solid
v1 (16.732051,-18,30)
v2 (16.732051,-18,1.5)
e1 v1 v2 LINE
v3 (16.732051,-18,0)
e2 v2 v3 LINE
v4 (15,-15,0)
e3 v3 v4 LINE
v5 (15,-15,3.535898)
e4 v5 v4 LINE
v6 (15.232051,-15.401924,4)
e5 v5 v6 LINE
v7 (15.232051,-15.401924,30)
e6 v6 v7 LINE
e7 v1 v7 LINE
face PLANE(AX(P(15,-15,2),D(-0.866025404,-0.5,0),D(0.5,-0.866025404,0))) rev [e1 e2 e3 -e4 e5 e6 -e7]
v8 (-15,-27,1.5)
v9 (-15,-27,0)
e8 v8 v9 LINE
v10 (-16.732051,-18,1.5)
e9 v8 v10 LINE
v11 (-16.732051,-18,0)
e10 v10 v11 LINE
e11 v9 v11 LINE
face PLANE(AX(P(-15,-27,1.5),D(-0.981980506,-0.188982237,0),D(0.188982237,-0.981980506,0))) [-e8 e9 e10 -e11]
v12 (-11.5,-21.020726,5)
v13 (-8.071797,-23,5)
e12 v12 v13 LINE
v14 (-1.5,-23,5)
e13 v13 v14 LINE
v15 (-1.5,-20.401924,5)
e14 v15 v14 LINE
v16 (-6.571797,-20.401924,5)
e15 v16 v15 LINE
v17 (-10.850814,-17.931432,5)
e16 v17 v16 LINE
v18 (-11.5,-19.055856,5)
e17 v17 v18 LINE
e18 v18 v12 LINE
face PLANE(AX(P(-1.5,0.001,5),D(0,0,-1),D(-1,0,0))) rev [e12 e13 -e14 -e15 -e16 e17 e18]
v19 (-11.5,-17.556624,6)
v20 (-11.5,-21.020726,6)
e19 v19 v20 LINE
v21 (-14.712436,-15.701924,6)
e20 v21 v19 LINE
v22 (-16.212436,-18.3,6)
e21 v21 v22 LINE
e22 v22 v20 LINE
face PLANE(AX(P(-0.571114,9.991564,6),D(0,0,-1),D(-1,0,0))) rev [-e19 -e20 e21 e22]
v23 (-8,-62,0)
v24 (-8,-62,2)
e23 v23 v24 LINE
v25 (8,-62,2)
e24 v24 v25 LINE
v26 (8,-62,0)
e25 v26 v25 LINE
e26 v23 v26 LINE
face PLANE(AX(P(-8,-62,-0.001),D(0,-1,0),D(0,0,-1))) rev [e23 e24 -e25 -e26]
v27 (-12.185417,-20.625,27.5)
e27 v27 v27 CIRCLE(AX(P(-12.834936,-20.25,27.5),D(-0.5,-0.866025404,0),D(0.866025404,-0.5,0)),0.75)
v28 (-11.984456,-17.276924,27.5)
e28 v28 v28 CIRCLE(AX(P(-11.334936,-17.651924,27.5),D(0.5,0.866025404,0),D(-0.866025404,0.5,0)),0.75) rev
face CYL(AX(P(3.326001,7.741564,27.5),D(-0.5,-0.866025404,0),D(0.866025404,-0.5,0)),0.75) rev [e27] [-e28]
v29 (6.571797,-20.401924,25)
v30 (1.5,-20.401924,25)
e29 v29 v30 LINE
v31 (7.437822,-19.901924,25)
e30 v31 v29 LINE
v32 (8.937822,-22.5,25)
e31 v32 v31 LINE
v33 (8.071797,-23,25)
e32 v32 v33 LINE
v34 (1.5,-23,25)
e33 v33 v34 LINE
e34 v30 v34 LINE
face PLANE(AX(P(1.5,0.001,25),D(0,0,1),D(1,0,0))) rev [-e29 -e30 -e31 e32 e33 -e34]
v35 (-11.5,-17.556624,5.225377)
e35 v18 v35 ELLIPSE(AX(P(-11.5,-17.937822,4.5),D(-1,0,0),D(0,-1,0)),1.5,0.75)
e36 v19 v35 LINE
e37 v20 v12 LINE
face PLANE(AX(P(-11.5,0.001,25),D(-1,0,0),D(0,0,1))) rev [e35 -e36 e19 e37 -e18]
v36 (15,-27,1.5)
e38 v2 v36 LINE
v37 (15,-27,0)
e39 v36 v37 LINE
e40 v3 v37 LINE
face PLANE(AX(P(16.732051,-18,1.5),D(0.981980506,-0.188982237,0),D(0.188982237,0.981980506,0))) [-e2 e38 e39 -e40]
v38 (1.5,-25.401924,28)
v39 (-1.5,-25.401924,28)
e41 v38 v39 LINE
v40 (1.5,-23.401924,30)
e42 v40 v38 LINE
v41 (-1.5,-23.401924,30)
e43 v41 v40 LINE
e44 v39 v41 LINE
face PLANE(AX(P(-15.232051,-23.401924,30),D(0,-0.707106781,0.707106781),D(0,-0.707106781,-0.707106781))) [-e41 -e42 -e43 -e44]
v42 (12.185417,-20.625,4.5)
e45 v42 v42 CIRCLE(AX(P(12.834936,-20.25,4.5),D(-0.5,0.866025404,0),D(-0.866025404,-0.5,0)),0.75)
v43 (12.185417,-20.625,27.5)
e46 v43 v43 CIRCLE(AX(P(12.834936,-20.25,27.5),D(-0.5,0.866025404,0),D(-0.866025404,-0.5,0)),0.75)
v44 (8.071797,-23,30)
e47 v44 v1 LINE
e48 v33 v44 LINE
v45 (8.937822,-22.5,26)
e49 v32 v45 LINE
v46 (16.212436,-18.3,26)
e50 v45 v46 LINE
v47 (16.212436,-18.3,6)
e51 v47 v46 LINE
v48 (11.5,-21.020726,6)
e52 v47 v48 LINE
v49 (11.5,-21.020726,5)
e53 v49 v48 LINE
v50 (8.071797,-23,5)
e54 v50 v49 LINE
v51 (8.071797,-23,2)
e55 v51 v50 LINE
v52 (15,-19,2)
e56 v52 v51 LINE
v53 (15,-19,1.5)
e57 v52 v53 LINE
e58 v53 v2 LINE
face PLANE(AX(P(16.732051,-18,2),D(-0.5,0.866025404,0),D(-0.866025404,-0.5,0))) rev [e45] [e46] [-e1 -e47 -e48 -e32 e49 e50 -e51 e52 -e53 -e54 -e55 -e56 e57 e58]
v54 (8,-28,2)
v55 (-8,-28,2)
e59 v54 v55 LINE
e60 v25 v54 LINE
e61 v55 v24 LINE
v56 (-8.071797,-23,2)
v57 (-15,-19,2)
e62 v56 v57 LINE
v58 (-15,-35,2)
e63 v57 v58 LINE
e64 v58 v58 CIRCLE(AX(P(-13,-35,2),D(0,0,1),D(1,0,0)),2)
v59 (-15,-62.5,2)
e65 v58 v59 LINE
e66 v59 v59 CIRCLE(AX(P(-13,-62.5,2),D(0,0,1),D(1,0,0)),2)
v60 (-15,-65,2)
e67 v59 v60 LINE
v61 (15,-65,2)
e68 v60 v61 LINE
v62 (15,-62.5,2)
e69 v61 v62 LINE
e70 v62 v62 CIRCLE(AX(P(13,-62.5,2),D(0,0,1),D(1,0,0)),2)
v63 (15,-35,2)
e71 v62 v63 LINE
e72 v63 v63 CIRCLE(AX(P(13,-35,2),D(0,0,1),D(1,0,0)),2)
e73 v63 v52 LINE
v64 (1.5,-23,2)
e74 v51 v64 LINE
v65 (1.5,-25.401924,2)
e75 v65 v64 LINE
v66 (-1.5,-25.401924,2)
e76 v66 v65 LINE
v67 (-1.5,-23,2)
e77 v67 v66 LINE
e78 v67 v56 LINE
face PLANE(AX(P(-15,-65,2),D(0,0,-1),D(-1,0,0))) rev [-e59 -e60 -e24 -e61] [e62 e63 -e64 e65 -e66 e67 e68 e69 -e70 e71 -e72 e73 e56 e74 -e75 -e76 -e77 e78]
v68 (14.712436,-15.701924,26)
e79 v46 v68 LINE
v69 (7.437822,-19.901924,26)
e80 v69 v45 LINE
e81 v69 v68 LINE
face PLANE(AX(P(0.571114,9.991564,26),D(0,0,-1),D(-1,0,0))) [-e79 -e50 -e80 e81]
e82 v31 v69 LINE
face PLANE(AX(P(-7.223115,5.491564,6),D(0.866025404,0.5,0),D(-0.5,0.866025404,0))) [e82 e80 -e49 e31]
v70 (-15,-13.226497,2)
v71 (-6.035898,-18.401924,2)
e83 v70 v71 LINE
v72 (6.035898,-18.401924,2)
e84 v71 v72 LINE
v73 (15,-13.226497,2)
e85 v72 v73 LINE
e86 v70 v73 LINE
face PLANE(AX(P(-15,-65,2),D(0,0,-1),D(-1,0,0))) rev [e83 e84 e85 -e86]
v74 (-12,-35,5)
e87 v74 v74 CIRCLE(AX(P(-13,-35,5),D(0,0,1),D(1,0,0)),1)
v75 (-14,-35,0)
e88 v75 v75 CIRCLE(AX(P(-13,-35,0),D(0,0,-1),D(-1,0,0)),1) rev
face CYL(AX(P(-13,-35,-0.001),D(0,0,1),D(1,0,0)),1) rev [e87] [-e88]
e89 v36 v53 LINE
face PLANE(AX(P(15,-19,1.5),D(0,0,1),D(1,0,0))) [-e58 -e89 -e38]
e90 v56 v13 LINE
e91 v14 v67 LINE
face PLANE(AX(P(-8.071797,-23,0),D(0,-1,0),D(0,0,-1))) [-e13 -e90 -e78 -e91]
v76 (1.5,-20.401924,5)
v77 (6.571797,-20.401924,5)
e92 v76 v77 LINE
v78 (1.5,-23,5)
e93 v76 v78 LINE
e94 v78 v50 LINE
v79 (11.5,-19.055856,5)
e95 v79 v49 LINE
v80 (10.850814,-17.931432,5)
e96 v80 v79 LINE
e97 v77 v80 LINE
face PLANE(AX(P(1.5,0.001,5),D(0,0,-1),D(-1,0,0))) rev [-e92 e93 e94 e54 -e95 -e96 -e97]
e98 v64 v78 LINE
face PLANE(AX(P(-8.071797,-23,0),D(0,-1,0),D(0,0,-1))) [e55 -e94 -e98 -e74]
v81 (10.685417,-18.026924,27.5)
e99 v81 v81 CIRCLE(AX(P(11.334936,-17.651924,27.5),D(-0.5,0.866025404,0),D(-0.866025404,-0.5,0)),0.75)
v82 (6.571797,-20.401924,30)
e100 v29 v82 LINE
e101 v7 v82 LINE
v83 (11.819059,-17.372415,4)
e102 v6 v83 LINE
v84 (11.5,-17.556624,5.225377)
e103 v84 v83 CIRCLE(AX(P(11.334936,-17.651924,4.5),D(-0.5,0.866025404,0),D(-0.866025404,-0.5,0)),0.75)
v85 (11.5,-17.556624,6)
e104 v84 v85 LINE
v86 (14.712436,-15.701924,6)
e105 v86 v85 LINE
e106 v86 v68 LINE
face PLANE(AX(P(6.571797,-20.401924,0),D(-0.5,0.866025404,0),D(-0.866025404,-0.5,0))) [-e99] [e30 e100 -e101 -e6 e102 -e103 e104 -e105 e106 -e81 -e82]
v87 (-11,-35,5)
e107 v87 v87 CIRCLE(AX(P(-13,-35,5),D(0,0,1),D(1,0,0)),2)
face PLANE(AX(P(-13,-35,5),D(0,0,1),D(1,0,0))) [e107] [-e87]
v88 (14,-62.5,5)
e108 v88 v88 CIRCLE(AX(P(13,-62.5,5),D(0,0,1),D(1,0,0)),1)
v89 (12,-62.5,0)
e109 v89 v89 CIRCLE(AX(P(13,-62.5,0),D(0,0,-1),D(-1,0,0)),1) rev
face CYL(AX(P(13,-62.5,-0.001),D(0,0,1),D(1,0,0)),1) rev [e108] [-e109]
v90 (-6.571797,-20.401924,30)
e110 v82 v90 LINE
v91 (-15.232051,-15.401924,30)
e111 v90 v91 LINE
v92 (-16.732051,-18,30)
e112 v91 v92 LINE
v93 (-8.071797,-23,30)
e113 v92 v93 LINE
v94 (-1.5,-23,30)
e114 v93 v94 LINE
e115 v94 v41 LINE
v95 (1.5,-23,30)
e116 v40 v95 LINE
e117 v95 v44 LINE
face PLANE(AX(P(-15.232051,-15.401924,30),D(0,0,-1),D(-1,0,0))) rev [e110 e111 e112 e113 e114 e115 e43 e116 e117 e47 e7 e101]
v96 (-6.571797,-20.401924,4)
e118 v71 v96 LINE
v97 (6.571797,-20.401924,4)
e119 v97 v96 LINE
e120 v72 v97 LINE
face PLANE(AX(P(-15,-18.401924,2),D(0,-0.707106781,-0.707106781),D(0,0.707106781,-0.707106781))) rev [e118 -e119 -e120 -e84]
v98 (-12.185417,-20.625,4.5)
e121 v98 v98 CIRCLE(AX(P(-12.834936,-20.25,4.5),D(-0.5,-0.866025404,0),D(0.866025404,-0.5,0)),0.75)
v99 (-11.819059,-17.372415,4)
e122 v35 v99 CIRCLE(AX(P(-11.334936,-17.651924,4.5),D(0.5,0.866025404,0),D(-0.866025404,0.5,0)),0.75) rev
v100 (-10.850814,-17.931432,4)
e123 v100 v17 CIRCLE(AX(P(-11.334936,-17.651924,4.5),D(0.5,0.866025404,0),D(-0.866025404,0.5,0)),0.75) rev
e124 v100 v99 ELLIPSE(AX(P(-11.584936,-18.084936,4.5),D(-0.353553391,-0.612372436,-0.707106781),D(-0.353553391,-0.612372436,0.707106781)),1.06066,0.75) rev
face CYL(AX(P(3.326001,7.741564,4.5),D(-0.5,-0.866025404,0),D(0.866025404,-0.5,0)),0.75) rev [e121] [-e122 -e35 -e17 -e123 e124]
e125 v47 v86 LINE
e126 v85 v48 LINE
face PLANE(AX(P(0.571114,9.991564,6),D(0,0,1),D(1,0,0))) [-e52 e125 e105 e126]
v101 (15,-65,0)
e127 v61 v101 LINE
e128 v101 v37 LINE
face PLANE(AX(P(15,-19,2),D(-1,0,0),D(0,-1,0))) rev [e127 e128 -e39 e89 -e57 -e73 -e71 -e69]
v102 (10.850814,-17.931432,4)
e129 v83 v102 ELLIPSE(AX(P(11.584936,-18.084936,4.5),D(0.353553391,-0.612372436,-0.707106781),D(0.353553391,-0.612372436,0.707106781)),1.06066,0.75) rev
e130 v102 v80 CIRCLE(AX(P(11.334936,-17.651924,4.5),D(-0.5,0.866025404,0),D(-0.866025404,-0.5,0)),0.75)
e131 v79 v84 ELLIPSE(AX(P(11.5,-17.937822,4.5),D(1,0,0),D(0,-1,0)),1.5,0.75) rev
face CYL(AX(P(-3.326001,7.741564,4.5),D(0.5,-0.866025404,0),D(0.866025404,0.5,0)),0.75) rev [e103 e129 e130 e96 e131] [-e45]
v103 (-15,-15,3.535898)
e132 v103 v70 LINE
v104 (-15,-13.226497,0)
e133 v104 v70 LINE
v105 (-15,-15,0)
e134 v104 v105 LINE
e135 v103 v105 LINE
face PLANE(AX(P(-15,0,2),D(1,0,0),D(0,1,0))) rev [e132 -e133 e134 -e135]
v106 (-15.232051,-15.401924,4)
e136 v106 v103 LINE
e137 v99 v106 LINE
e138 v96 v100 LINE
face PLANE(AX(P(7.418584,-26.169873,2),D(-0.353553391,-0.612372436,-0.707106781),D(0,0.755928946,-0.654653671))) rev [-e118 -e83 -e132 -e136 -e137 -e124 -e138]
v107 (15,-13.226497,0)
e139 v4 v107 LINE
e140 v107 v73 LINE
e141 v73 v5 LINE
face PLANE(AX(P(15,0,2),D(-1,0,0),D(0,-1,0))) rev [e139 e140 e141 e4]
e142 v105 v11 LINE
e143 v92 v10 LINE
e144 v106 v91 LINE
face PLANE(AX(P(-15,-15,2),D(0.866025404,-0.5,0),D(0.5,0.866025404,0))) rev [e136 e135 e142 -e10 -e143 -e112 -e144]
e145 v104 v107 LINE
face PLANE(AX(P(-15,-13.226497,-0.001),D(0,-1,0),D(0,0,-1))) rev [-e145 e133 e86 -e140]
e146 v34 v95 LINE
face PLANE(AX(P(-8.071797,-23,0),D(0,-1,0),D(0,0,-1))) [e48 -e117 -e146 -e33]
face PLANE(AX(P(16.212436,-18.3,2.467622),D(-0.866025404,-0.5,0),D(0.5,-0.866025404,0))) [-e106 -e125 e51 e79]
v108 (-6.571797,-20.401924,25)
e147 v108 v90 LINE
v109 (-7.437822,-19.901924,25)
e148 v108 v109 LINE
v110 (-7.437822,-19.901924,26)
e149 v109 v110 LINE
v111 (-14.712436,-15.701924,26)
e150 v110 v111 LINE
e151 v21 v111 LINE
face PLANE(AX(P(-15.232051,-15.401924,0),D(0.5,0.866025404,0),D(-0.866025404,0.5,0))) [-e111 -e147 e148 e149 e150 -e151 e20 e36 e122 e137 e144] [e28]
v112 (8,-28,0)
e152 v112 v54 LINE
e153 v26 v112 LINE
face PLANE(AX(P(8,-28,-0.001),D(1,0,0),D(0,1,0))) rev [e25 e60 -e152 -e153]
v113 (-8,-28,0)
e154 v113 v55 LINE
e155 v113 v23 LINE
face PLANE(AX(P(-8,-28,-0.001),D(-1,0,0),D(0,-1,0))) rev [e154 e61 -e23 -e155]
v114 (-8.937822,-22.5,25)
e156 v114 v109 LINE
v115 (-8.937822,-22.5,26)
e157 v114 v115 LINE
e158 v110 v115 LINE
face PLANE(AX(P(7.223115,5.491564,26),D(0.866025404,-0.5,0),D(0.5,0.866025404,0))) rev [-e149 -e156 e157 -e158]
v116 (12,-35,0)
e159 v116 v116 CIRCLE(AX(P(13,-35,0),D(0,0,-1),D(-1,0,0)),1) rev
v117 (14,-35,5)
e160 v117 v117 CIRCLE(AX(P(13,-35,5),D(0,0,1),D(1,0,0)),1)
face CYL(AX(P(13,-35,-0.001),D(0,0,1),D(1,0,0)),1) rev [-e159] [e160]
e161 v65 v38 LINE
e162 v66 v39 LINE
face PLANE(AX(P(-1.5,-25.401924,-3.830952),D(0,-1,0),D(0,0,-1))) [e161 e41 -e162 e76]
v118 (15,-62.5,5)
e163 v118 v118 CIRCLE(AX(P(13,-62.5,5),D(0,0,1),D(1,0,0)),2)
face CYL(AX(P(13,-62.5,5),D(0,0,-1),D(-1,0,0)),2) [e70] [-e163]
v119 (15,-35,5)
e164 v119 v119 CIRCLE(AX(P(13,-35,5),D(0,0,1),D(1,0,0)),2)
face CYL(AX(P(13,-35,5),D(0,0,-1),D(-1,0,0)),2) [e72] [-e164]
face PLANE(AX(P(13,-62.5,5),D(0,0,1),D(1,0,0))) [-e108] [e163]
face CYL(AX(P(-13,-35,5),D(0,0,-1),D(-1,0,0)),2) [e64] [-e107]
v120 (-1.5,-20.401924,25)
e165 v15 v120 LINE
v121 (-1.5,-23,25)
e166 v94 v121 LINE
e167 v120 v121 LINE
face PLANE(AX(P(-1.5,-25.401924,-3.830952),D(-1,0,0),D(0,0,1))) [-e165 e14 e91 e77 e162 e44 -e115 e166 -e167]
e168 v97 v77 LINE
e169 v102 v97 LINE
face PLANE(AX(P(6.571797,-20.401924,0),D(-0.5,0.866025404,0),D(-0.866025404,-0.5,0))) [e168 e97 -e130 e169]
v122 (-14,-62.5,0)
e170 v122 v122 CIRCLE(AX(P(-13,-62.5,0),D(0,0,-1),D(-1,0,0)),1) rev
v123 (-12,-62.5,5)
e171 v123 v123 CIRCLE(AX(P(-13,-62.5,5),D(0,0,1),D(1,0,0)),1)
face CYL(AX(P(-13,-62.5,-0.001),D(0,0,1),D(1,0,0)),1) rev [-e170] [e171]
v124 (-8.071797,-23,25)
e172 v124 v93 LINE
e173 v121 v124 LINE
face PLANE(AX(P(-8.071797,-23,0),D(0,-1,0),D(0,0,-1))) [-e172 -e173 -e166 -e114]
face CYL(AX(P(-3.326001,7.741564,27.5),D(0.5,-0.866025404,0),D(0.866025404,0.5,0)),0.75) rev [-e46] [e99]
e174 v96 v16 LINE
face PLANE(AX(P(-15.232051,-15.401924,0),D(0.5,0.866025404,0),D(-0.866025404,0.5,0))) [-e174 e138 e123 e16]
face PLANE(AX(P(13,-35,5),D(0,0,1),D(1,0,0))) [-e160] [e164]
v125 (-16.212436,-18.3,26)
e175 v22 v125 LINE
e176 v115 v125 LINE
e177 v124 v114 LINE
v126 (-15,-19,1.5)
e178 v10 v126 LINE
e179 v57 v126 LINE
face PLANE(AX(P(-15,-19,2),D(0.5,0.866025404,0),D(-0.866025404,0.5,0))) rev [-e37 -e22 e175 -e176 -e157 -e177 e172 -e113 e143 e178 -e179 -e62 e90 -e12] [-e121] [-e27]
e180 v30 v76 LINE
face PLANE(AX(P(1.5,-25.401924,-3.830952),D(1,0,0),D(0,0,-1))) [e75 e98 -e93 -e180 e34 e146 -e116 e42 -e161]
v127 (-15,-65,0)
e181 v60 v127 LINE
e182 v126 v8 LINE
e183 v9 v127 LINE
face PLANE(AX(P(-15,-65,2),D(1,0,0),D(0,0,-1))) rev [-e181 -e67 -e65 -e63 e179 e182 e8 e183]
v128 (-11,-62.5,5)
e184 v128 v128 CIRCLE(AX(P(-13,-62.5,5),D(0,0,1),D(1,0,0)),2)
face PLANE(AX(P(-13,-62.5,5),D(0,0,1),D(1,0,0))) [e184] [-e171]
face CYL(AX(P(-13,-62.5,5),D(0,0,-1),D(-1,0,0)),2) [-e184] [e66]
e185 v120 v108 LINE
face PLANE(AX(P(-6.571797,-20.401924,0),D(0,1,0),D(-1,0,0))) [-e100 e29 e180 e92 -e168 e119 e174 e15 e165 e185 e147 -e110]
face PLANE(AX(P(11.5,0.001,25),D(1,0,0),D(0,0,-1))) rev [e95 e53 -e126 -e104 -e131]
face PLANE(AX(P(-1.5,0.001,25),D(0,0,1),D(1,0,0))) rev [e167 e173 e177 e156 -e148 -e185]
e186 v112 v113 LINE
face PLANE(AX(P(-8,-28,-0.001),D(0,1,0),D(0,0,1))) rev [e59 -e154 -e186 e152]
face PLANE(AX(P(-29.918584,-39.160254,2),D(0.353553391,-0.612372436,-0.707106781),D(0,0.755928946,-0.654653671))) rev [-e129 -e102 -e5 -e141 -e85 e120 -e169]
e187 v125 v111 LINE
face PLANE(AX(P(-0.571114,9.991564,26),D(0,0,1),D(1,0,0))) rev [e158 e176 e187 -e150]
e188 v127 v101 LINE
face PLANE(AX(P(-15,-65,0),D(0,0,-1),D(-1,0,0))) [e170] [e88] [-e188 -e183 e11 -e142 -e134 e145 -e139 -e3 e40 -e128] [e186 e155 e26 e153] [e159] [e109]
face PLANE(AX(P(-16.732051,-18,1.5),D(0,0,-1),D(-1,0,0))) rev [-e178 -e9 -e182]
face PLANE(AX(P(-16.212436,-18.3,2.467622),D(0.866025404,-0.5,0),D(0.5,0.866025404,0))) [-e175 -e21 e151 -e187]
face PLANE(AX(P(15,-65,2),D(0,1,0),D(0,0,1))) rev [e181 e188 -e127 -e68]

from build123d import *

# Parameters (mm, degrees)
EXTRUDE_1_DEPTH      = 2
EXTRUDE_2_DEPTH      = 28
EXTRUDE_2_DEPTH_BACK = 2
CUT_EXTRUDE_5_REACH  = 61.651
SKETCH_3_R           = 0.75
SKETCH_3_W           = 9
SKETCH_3_H           = 20
CUT_EXTRUDE_7_REACH  = 62.685
SKETCH_12_R          = 0.75
SKETCH_12_W          = 9
SKETCH_12_H          = 20
CUT_EXTRUDE_8_REACH  = 74.725
SKETCH_13_R          = 1
SKETCH_13_W          = 16
SKETCH_13_H          = 34
CHAMFER_5_SIZE       = 2
SKETCH_14_W          = 3
SKETCH_14_H          = 5
EXTRUDE_8_DEPTH      = 28
CHAMFER_6_SIZE       = 2
EXTRUDE_START        = 3
SKETCH_15_R          = 2
SKETCH_15_R_2        = 1
EXTRUDE_9_DEPTH      = 3
CUT_EXTRUDE_9_REACH  = 56.258
SKETCH_16_W          = 10
SKETCH_16_H          = 20
EXTRUDE_10_DEPTH     = 24
EXTRUDE_11_DEPTH     = 1.5
CUT_EXTRUDE_10_REACH = 74.725
SKETCH_19_W          = 30
SKETCH_19_H          = 13.226497308


with BuildPart() as part:
    # 草圖1 → 填料-伸長1 (new body)
    with BuildSketch(Plane.XY):
        Polygon((-15, 0), (15, 0), (15, -15), (16.732050808, -18), (15, -19), (15, -65), (-15, -65), (-15, -19), (-16.732050808, -18), (-15, -15), align=None)
    extrude(amount=EXTRUDE_1_DEPTH)

    # 草圖2 → 填料-伸長2 (add, two sides: drawn at the far end of the back side and taken through both)
    with BuildSketch(Plane.XY.offset(2).offset(-EXTRUDE_2_DEPTH_BACK)):
        Polygon((-16.732050808, -18), (-8.07179677, -23), (8.07179677, -23), (16.732050808, -18), (15.232050808, -15.401923789), (6.57179677, -20.401923789), (-6.57179677, -20.401923789), (-15.232050808, -15.401923789), align=None)
    extrude(amount=EXTRUDE_2_DEPTH + EXTRUDE_2_DEPTH_BACK)

    # 草圖3 → 除料-伸長5 (cut, up to next)
    with BuildSketch(Plane(origin=(10.813121216, -21.417295593, 0), x_dir=(0.8660254037844397, 0.49999999999999806, 0), z_dir=(-0.49999999999999806, 0.8660254037844397, 0)), mode=Mode.PRIVATE) as cut_extrude_5_sk1:
        with Locations(Location((2.334591186, -4.5, 0), (0, 0, 180))):
            Circle(SKETCH_3_R)
    cut_extrude_5_tool1 = extrude(cut_extrude_5_sk1.sketch, amount=CUT_EXTRUDE_5_REACH, mode=Mode.PRIVATE) & part.part
    # 草圖3 → 除料-伸長5 (cut, up to next)
    with BuildSketch(Plane(origin=(10.813121216, -21.417295593, 0), x_dir=(0.8660254037844397, 0.49999999999999806, 0), z_dir=(-0.49999999999999806, 0.8660254037844397, 0)), mode=Mode.PRIVATE) as cut_extrude_5_sk2:
        with Locations(Location((2.334591186, -27.5, 0), (0, 0, 180))):
            Circle(SKETCH_3_R)
    cut_extrude_5_tool2 = extrude(cut_extrude_5_sk2.sketch, amount=CUT_EXTRUDE_5_REACH, mode=Mode.PRIVATE) & part.part
    # 草圖3 → 除料-伸長5 (cut, up to next)
    with BuildSketch(Plane(origin=(10.813121216, -21.417295593, 0), x_dir=(0.8660254037844397, 0.49999999999999806, 0), z_dir=(-0.49999999999999806, 0.8660254037844397, 0)), mode=Mode.PRIVATE) as cut_extrude_5_sk3:
        with Locations((2.334591186, -16)):
            Rectangle(SKETCH_3_W, SKETCH_3_H)
    cut_extrude_5_tool3 = extrude(cut_extrude_5_sk3.sketch, amount=CUT_EXTRUDE_5_REACH, mode=Mode.PRIVATE) & part.part
    add(cut_extrude_5_tool1.solids().sort_by_distance((12.834936, -20.25, 4.5))[0], mode=Mode.SUBTRACT)
    add(cut_extrude_5_tool2.solids().sort_by_distance((12.834936, -20.25, 27.5))[0], mode=Mode.SUBTRACT)
    add(cut_extrude_5_tool3.solids().sort_by_distance((12.834936, -20.25, 16))[0], mode=Mode.SUBTRACT)

    # 草圖12 → 除料-伸長7 (cut, up to next)
    with BuildSketch(Plane(origin=(-11.977241336, -20.745190528, 0), x_dir=(0.8660254037844368, -0.5000000000000032, 0), z_dir=(-0.5000000000000032, -0.8660254037844369, 0)), mode=Mode.PRIVATE) as cut_extrude_7_sk1:
        with Locations((-0.990381057, 27.5)):
            Circle(SKETCH_12_R)
    cut_extrude_7_tool1 = extrude(cut_extrude_7_sk1.sketch, amount=-CUT_EXTRUDE_7_REACH, mode=Mode.PRIVATE) & part.part
    # 草圖12 → 除料-伸長7 (cut, up to next)
    with BuildSketch(Plane(origin=(-11.977241336, -20.745190528, 0), x_dir=(0.8660254037844368, -0.5000000000000032, 0), z_dir=(-0.5000000000000032, -0.8660254037844369, 0)), mode=Mode.PRIVATE) as cut_extrude_7_sk2:
        with Locations((-0.990381057, 4.5)):
            Circle(SKETCH_12_R)
    cut_extrude_7_tool2 = extrude(cut_extrude_7_sk2.sketch, amount=-CUT_EXTRUDE_7_REACH, mode=Mode.PRIVATE) & part.part
    # 草圖12 → 除料-伸長7 (cut, up to next)
    with BuildSketch(Plane(origin=(-11.977241336, -20.745190528, 0), x_dir=(0.8660254037844368, -0.5000000000000032, 0), z_dir=(-0.5000000000000032, -0.8660254037844369, 0)), mode=Mode.PRIVATE) as cut_extrude_7_sk3:
        with Locations((-0.990381057, 16)):
            Rectangle(SKETCH_12_W, SKETCH_12_H)
    cut_extrude_7_tool3 = extrude(cut_extrude_7_sk3.sketch, amount=-CUT_EXTRUDE_7_REACH, mode=Mode.PRIVATE) & part.part
    add(cut_extrude_7_tool1.solids().sort_by_distance((-12.834936, -20.25, 27.5))[0], mode=Mode.SUBTRACT)
    add(cut_extrude_7_tool2.solids().sort_by_distance((-12.834936, -20.25, 4.5))[0], mode=Mode.SUBTRACT)
    add(cut_extrude_7_tool3.solids().sort_by_distance((-12.834936, -20.25, 16))[0], mode=Mode.SUBTRACT)

    # 草圖13 → 除料-伸長8 (cut, up to next)
    with BuildSketch(Plane.XY.offset(2), mode=Mode.PRIVATE) as cut_extrude_8_sk1:
        with Locations((-13, -35)):
            Circle(SKETCH_13_R)
    cut_extrude_8_tool1 = extrude(cut_extrude_8_sk1.sketch, amount=-CUT_EXTRUDE_8_REACH, mode=Mode.PRIVATE) & part.part
    # 草圖13 → 除料-伸長8 (cut, up to next)
    with BuildSketch(Plane.XY.offset(2), mode=Mode.PRIVATE) as cut_extrude_8_sk2:
        with Locations((13, -35)):
            Circle(SKETCH_13_R)
    cut_extrude_8_tool2 = extrude(cut_extrude_8_sk2.sketch, amount=-CUT_EXTRUDE_8_REACH, mode=Mode.PRIVATE) & part.part
    # 草圖13 → 除料-伸長8 (cut, up to next)
    with BuildSketch(Plane.XY.offset(2), mode=Mode.PRIVATE) as cut_extrude_8_sk3:
        with Locations((-13, -62.5)):
            Circle(SKETCH_13_R)
    cut_extrude_8_tool3 = extrude(cut_extrude_8_sk3.sketch, amount=-CUT_EXTRUDE_8_REACH, mode=Mode.PRIVATE) & part.part
    # 草圖13 → 除料-伸長8 (cut, up to next)
    with BuildSketch(Plane.XY.offset(2), mode=Mode.PRIVATE) as cut_extrude_8_sk4:
        with Locations((13, -62.5)):
            Circle(SKETCH_13_R)
    cut_extrude_8_tool4 = extrude(cut_extrude_8_sk4.sketch, amount=-CUT_EXTRUDE_8_REACH, mode=Mode.PRIVATE) & part.part
    # 草圖13 → 除料-伸長8 (cut, up to next)
    with BuildSketch(Plane.XY.offset(2), mode=Mode.PRIVATE) as cut_extrude_8_sk5:
        with Locations((0, -45)):
            Rectangle(SKETCH_13_W, SKETCH_13_H)
    cut_extrude_8_tool5 = extrude(cut_extrude_8_sk5.sketch, amount=-CUT_EXTRUDE_8_REACH, mode=Mode.PRIVATE) & part.part
    add(cut_extrude_8_tool1.solids().sort_by_distance((-13, -35, 2))[0], mode=Mode.SUBTRACT)
    add(cut_extrude_8_tool2.solids().sort_by_distance((13, -35, 2))[0], mode=Mode.SUBTRACT)
    add(cut_extrude_8_tool3.solids().sort_by_distance((-13, -62.5, 2))[0], mode=Mode.SUBTRACT)
    add(cut_extrude_8_tool4.solids().sort_by_distance((13, -62.5, 2))[0], mode=Mode.SUBTRACT)
    add(cut_extrude_8_tool5.solids().sort_by_distance((0, -45, 2))[0], mode=Mode.SUBTRACT)

    # 導角5
    # the kernel refuses this chamfer: 2 mm, written as the material it adds along each edge
    with BuildSketch(Plane(origin=(15.232050808, -15.401923789, 2), x_dir=(-0.4998109584556485, 0.8656979742248804, -0.027495876610586403), z_dir=(-0.8660254037844387, -0.5000000000000001, 0))) as chamfer_5_piece_1_section:
        Polygon((CHAMFER_5_SIZE * 0.999621916911, -CHAMFER_5_SIZE * 0.0274958766106), (-CHAMFER_5_SIZE * 0.0274958766106, -CHAMFER_5_SIZE * 0.999621916911), (0, 0), align=None)
    chamfer_5_piece_1 = extrude(amount=15.143365976, mode=Mode.PRIVATE)
    chamfer_5_piece_1 = split(chamfer_5_piece_1, bisect_by=Plane(origin=(15, -15.354369678, 2.967720973), z_dir=(1, 0, 0)), keep=Keep.TOP, mode=Mode.PRIVATE)
    add(chamfer_5_piece_1)
    with BuildSketch(Plane(origin=(19.686336404, -12.830240801, 2), x_dir=(-0.4998109584556485, 0.8656979742248805, -0.027495876610586424), z_dir=(-0.8660254037844387, -0.5000000000000001, 0))) as chamfer_5_piece_2_section:
        Polygon((CHAMFER_5_SIZE * 0.999621916911, -CHAMFER_5_SIZE * 0.0274958766106), (-CHAMFER_5_SIZE * 0.0274958766106, -CHAMFER_5_SIZE * 0.999621916911), (0, 0), align=None)
    chamfer_5_piece_2 = extrude(amount=20.286731952, mode=Mode.PRIVATE)
    chamfer_5_piece_2 = split(chamfer_5_piece_2, bisect_by=Plane(origin=(15, -14.178978025, 2.335634482), z_dir=(-1, 0, 0)), keep=Keep.TOP, mode=Mode.PRIVATE)
    chamfer_5_piece_2 = split(chamfer_5_piece_2, bisect_by=Plane(origin=(14.593699493, -14.296266878, 2.335634482), z_dir=(0.8660254037844362, 0.5000000000000043, 0)), keep=Keep.TOP, mode=Mode.PRIVATE)
    add(chamfer_5_piece_2)
    with BuildSketch(Plane(origin=(15.232050808, -15.401923789, 2), x_dir=(-0.4998109584556485, 0.8656979742248804, -0.027495876610586403), z_dir=(-0.8660254037844387, -0.5000000000000001, 0))) as chamfer_5_piece_3_section:
        Polygon((CHAMFER_5_SIZE * 0.999621916911, -CHAMFER_5_SIZE * 0.0274958766106), (-CHAMFER_5_SIZE * 0.0274958766106, -CHAMFER_5_SIZE * 0.999621916911), (0, 0), align=None)
    chamfer_5_piece_3 = extrude(amount=15.143365976, mode=Mode.PRIVATE)
    chamfer_5_piece_3 = split(chamfer_5_piece_3, bisect_by=Plane(origin=(15, -17.612583445, 2.634430094), z_dir=(-1, 0, 0)), keep=Keep.TOP, mode=Mode.PRIVATE)
    chamfer_5_piece_3 = split(chamfer_5_piece_3, bisect_by=Plane(origin=(9.995642462, -20.401923789, 2.634430094), z_dir=(0, 1, 0)), keep=Keep.TOP, mode=Mode.PRIVATE)
    chamfer_5_piece_3 = chamfer_5_piece_3 - Plane(origin=(10.983078115, -17.042487205, 4.5), x_dir=(-0.8660254037844397, -0.49999999999999806, 0), z_dir=(0.49999999999999806, -0.8660254037844397, 0)) * Cylinder(0.75, 39, mode=Mode.PRIVATE)
    add(chamfer_5_piece_3)
    with BuildSketch(Plane(origin=(15.232050808, -15.401923789, 2), x_dir=(-0.4998109584556485, 0.8656979742248804, -0.027495876610586403), z_dir=(-0.8660254037844387, -0.5000000000000001, 0))) as chamfer_5_piece_4_section:
        Polygon((CHAMFER_5_SIZE * 0.999621916911, -CHAMFER_5_SIZE * 0.0274958766106), (-CHAMFER_5_SIZE * 0.0274958766106, -CHAMFER_5_SIZE * 0.999621916911), (0, 0), align=None)
    chamfer_5_piece_4 = extrude(amount=15.143365976, mode=Mode.PRIVATE)
    chamfer_5_piece_4 = split(chamfer_5_piece_4, bisect_by=Plane(origin=(3.657625077, -20.401923789, 2.718374554), z_dir=(0, -1, 0)), keep=Keep.TOP, mode=Mode.PRIVATE)
    add(chamfer_5_piece_4)
    with BuildSketch(Plane(origin=(11.715162746, -20.401923789, 2), x_dir=(0, 0.9996219169112968, -0.027495876610586403), z_dir=(-1, 0, 0))) as chamfer_5_piece_5:
        Polygon((CHAMFER_5_SIZE * 0.999621916911, -CHAMFER_5_SIZE * 0.0274958766106), (-CHAMFER_5_SIZE * 0.0274958766106, -CHAMFER_5_SIZE * 0.999621916911), (0, 0), align=None)
    extrude(amount=23.430325491)
    with BuildSketch(Plane(origin=(-2.117511174, -22.973606777, 2), x_dir=(0.4998109584556478, 0.8656979742248807, -0.027495876610586365), z_dir=(-0.866025403784439, 0.4999999999999994, 0))) as chamfer_5_piece_6_section:
        Polygon((CHAMFER_5_SIZE * 0.999621916911, -CHAMFER_5_SIZE * 0.0274958766106), (-CHAMFER_5_SIZE * 0.0274958766106, -CHAMFER_5_SIZE * 0.999621916911), (0, 0), align=None)
    chamfer_5_piece_6 = extrude(amount=15.143365976, mode=Mode.PRIVATE)
    chamfer_5_piece_6 = split(chamfer_5_piece_6, bisect_by=Plane(origin=(-3.657625077, -20.401923789, 2.718374554), z_dir=(0, -1, 0)), keep=Keep.TOP, mode=Mode.PRIVATE)
    add(chamfer_5_piece_6)
    with BuildSketch(Plane(origin=(-2.117511174, -22.973606777, 2), x_dir=(0.4998109584556478, 0.8656979742248807, -0.027495876610586365), z_dir=(-0.866025403784439, 0.4999999999999994, 0))) as chamfer_5_piece_7_section:
        Polygon((CHAMFER_5_SIZE * 0.999621916911, -CHAMFER_5_SIZE * 0.0274958766106), (-CHAMFER_5_SIZE * 0.0274958766106, -CHAMFER_5_SIZE * 0.999621916911), (0, 0), align=None)
    chamfer_5_piece_7 = extrude(amount=15.143365976, mode=Mode.PRIVATE)
    chamfer_5_piece_7 = split(chamfer_5_piece_7, bisect_by=Plane(origin=(-15, -17.612583445, 2.634430094), z_dir=(1, 0, 0)), keep=Keep.TOP, mode=Mode.PRIVATE)
    chamfer_5_piece_7 = split(chamfer_5_piece_7, bisect_by=Plane(origin=(-9.995642462, -20.401923789, 2.634430094), z_dir=(0, 1, 0)), keep=Keep.TOP, mode=Mode.PRIVATE)
    chamfer_5_piece_7 = chamfer_5_piece_7 - Plane(origin=(-10.983078115, -17.042487205, 4.5), x_dir=(0.8660254037844369, -0.5000000000000032, 0), z_dir=(-0.5000000000000032, -0.8660254037844369, 0)) * Cylinder(0.75, 39, mode=Mode.PRIVATE)
    add(chamfer_5_piece_7)
    with BuildSketch(Plane(origin=(-2.117511174, -22.973606777, 2), x_dir=(0.4998109584556478, 0.8656979742248807, -0.027495876610586365), z_dir=(-0.866025403784439, 0.4999999999999994, 0))) as chamfer_5_piece_8_section:
        Polygon((CHAMFER_5_SIZE * 0.999621916911, -CHAMFER_5_SIZE * 0.0274958766106), (-CHAMFER_5_SIZE * 0.0274958766106, -CHAMFER_5_SIZE * 0.999621916911), (0, 0), align=None)
    chamfer_5_piece_8 = extrude(amount=15.143365976, mode=Mode.PRIVATE)
    chamfer_5_piece_8 = split(chamfer_5_piece_8, bisect_by=Plane(origin=(-15, -15.354369678, 2.967720973), z_dir=(-1, 0, 0)), keep=Keep.TOP, mode=Mode.PRIVATE)
    add(chamfer_5_piece_8)
    with BuildSketch(Plane(origin=(-2.117511174, -22.973606777, 2), x_dir=(0.4998109584556478, 0.8656979742248807, -0.027495876610586365), z_dir=(-0.866025403784439, 0.4999999999999994, 0))) as chamfer_5_piece_9_section:
        Polygon((CHAMFER_5_SIZE * 0.999621916911, -CHAMFER_5_SIZE * 0.0274958766106), (-CHAMFER_5_SIZE * 0.0274958766106, -CHAMFER_5_SIZE * 0.999621916911), (0, 0), align=None)
    chamfer_5_piece_9 = extrude(amount=20.286731952, mode=Mode.PRIVATE)
    chamfer_5_piece_9 = split(chamfer_5_piece_9, bisect_by=Plane(origin=(-15, -14.178978025, 2.335634482), z_dir=(1, 0, 0)), keep=Keep.TOP, mode=Mode.PRIVATE)
    chamfer_5_piece_9 = split(chamfer_5_piece_9, bisect_by=Plane(origin=(-14.593699493, -14.296266878, 2.335634482), z_dir=(-0.8660254037844384, 0.5000000000000004, 0)), keep=Keep.TOP, mode=Mode.PRIVATE)
    add(chamfer_5_piece_9)

    # 草圖14 → 填料-伸長8 (add)
    with BuildSketch(Plane.XY.offset(30)):
        with Locations((0, -22.901923789)):
            Rectangle(SKETCH_14_W, SKETCH_14_H)
    extrude(amount=-EXTRUDE_8_DEPTH)

    # 導角6
    chamfer_6_edges = [part.edges().sort_by_distance(p)[0] for p in [
        (0, -25.401923789, 30),
    ]]
    chamfer(chamfer_6_edges, length=CHAMFER_6_SIZE)

    # 草圖15 → 填料-伸長9 (add)
    # profile 1 of 4: a face of its own
    with BuildSketch(Plane.XY.offset(2).offset(EXTRUDE_START)):
        with Locations(Location((-13, -35, 0), (0, 0, 180))):
            Circle(SKETCH_15_R)
        with Locations((-13, -35)):
            Circle(SKETCH_15_R_2, mode=Mode.SUBTRACT)
    # profile 2 of 4: a face of its own
    with BuildSketch(Plane.XY.offset(2).offset(EXTRUDE_START)):
        with Locations((13, -35)):
            Circle(SKETCH_15_R)
        with Locations((13, -35)):
            Circle(SKETCH_15_R_2, mode=Mode.SUBTRACT)
    # profile 3 of 4: a face of its own
    with BuildSketch(Plane.XY.offset(2).offset(EXTRUDE_START)):
        with Locations((13, -62.5)):
            Circle(SKETCH_15_R)
        with Locations((13, -62.5)):
            Circle(SKETCH_15_R_2, mode=Mode.SUBTRACT)
    # profile 4 of 4: a face of its own
    with BuildSketch(Plane.XY.offset(2).offset(EXTRUDE_START)):
        with Locations(Location((-13, -62.5, 0), (0, 0, 180))):
            Circle(SKETCH_15_R)
        with Locations((-13, -62.5)):
            Circle(SKETCH_15_R_2, mode=Mode.SUBTRACT)
    extrude(amount=-EXTRUDE_9_DEPTH)

    # 草圖16 → 除料-伸長9 (cut, up to next)
    with BuildSketch(Plane.XZ.offset(23), mode=Mode.PRIVATE) as cut_extrude_9_sk1:
        with Locations((-6.5, 15)):
            Rectangle(SKETCH_16_W, SKETCH_16_H)
    cut_extrude_9_tool1 = extrude(cut_extrude_9_sk1.sketch, amount=-CUT_EXTRUDE_9_REACH, mode=Mode.PRIVATE) & part.part
    # 草圖16 → 除料-伸長9 (cut, up to next)
    with BuildSketch(Plane.XZ.offset(23), mode=Mode.PRIVATE) as cut_extrude_9_sk2:
        with Locations((6.5, 15)):
            Rectangle(SKETCH_16_W, SKETCH_16_H)
    cut_extrude_9_tool2 = extrude(cut_extrude_9_sk2.sketch, amount=-CUT_EXTRUDE_9_REACH, mode=Mode.PRIVATE) & part.part
    add(cut_extrude_9_tool1.solids().sort_by_distance((-6.5, -23, 15))[0], mode=Mode.SUBTRACT)
    add(cut_extrude_9_tool2.solids().sort_by_distance((6.5, -23, 15))[0], mode=Mode.SUBTRACT)

    # 草圖17 → 填料-伸長10 (add)
    with BuildSketch(Plane.XY.offset(30)):
        Polygon((-15.232050808, -15.401923789), (-16.732050808, -18), (-16.212435565, -18.3), (-14.712435565, -15.701923789), align=None)
        Polygon((15.232050808, -15.401923789), (16.732050808, -18), (16.212435565, -18.3), (14.712435565, -15.701923789), align=None)
    extrude(amount=-EXTRUDE_10_DEPTH)

    # 草圖18 → 填料-伸長11 (add)
    with BuildSketch(Plane(origin=(0, 0, 0), x_dir=(-1, 0, 0), z_dir=(0, 0, -1))):
        Polygon((-16.732050808, -18), (-15, -27), (-15, -19), align=None)
        Polygon((16.732050808, -18), (15, -19), (15, -27), align=None)
    extrude(amount=-EXTRUDE_11_DEPTH)

    # 草圖19 → 除料-伸長10 (cut, up to next)
    with BuildSketch(Plane.XY.offset(2), mode=Mode.PRIVATE) as cut_extrude_10_sk1:
        with Locations((0, -6.613248654)):
            Rectangle(SKETCH_19_W, SKETCH_19_H)
    cut_extrude_10_tool1 = extrude(cut_extrude_10_sk1.sketch, amount=-CUT_EXTRUDE_10_REACH, mode=Mode.PRIVATE) & part.part
    add(cut_extrude_10_tool1.solids().sort_by_distance((0, -6.613249, 2))[0], mode=Mode.SUBTRACT)


solid = part.part
